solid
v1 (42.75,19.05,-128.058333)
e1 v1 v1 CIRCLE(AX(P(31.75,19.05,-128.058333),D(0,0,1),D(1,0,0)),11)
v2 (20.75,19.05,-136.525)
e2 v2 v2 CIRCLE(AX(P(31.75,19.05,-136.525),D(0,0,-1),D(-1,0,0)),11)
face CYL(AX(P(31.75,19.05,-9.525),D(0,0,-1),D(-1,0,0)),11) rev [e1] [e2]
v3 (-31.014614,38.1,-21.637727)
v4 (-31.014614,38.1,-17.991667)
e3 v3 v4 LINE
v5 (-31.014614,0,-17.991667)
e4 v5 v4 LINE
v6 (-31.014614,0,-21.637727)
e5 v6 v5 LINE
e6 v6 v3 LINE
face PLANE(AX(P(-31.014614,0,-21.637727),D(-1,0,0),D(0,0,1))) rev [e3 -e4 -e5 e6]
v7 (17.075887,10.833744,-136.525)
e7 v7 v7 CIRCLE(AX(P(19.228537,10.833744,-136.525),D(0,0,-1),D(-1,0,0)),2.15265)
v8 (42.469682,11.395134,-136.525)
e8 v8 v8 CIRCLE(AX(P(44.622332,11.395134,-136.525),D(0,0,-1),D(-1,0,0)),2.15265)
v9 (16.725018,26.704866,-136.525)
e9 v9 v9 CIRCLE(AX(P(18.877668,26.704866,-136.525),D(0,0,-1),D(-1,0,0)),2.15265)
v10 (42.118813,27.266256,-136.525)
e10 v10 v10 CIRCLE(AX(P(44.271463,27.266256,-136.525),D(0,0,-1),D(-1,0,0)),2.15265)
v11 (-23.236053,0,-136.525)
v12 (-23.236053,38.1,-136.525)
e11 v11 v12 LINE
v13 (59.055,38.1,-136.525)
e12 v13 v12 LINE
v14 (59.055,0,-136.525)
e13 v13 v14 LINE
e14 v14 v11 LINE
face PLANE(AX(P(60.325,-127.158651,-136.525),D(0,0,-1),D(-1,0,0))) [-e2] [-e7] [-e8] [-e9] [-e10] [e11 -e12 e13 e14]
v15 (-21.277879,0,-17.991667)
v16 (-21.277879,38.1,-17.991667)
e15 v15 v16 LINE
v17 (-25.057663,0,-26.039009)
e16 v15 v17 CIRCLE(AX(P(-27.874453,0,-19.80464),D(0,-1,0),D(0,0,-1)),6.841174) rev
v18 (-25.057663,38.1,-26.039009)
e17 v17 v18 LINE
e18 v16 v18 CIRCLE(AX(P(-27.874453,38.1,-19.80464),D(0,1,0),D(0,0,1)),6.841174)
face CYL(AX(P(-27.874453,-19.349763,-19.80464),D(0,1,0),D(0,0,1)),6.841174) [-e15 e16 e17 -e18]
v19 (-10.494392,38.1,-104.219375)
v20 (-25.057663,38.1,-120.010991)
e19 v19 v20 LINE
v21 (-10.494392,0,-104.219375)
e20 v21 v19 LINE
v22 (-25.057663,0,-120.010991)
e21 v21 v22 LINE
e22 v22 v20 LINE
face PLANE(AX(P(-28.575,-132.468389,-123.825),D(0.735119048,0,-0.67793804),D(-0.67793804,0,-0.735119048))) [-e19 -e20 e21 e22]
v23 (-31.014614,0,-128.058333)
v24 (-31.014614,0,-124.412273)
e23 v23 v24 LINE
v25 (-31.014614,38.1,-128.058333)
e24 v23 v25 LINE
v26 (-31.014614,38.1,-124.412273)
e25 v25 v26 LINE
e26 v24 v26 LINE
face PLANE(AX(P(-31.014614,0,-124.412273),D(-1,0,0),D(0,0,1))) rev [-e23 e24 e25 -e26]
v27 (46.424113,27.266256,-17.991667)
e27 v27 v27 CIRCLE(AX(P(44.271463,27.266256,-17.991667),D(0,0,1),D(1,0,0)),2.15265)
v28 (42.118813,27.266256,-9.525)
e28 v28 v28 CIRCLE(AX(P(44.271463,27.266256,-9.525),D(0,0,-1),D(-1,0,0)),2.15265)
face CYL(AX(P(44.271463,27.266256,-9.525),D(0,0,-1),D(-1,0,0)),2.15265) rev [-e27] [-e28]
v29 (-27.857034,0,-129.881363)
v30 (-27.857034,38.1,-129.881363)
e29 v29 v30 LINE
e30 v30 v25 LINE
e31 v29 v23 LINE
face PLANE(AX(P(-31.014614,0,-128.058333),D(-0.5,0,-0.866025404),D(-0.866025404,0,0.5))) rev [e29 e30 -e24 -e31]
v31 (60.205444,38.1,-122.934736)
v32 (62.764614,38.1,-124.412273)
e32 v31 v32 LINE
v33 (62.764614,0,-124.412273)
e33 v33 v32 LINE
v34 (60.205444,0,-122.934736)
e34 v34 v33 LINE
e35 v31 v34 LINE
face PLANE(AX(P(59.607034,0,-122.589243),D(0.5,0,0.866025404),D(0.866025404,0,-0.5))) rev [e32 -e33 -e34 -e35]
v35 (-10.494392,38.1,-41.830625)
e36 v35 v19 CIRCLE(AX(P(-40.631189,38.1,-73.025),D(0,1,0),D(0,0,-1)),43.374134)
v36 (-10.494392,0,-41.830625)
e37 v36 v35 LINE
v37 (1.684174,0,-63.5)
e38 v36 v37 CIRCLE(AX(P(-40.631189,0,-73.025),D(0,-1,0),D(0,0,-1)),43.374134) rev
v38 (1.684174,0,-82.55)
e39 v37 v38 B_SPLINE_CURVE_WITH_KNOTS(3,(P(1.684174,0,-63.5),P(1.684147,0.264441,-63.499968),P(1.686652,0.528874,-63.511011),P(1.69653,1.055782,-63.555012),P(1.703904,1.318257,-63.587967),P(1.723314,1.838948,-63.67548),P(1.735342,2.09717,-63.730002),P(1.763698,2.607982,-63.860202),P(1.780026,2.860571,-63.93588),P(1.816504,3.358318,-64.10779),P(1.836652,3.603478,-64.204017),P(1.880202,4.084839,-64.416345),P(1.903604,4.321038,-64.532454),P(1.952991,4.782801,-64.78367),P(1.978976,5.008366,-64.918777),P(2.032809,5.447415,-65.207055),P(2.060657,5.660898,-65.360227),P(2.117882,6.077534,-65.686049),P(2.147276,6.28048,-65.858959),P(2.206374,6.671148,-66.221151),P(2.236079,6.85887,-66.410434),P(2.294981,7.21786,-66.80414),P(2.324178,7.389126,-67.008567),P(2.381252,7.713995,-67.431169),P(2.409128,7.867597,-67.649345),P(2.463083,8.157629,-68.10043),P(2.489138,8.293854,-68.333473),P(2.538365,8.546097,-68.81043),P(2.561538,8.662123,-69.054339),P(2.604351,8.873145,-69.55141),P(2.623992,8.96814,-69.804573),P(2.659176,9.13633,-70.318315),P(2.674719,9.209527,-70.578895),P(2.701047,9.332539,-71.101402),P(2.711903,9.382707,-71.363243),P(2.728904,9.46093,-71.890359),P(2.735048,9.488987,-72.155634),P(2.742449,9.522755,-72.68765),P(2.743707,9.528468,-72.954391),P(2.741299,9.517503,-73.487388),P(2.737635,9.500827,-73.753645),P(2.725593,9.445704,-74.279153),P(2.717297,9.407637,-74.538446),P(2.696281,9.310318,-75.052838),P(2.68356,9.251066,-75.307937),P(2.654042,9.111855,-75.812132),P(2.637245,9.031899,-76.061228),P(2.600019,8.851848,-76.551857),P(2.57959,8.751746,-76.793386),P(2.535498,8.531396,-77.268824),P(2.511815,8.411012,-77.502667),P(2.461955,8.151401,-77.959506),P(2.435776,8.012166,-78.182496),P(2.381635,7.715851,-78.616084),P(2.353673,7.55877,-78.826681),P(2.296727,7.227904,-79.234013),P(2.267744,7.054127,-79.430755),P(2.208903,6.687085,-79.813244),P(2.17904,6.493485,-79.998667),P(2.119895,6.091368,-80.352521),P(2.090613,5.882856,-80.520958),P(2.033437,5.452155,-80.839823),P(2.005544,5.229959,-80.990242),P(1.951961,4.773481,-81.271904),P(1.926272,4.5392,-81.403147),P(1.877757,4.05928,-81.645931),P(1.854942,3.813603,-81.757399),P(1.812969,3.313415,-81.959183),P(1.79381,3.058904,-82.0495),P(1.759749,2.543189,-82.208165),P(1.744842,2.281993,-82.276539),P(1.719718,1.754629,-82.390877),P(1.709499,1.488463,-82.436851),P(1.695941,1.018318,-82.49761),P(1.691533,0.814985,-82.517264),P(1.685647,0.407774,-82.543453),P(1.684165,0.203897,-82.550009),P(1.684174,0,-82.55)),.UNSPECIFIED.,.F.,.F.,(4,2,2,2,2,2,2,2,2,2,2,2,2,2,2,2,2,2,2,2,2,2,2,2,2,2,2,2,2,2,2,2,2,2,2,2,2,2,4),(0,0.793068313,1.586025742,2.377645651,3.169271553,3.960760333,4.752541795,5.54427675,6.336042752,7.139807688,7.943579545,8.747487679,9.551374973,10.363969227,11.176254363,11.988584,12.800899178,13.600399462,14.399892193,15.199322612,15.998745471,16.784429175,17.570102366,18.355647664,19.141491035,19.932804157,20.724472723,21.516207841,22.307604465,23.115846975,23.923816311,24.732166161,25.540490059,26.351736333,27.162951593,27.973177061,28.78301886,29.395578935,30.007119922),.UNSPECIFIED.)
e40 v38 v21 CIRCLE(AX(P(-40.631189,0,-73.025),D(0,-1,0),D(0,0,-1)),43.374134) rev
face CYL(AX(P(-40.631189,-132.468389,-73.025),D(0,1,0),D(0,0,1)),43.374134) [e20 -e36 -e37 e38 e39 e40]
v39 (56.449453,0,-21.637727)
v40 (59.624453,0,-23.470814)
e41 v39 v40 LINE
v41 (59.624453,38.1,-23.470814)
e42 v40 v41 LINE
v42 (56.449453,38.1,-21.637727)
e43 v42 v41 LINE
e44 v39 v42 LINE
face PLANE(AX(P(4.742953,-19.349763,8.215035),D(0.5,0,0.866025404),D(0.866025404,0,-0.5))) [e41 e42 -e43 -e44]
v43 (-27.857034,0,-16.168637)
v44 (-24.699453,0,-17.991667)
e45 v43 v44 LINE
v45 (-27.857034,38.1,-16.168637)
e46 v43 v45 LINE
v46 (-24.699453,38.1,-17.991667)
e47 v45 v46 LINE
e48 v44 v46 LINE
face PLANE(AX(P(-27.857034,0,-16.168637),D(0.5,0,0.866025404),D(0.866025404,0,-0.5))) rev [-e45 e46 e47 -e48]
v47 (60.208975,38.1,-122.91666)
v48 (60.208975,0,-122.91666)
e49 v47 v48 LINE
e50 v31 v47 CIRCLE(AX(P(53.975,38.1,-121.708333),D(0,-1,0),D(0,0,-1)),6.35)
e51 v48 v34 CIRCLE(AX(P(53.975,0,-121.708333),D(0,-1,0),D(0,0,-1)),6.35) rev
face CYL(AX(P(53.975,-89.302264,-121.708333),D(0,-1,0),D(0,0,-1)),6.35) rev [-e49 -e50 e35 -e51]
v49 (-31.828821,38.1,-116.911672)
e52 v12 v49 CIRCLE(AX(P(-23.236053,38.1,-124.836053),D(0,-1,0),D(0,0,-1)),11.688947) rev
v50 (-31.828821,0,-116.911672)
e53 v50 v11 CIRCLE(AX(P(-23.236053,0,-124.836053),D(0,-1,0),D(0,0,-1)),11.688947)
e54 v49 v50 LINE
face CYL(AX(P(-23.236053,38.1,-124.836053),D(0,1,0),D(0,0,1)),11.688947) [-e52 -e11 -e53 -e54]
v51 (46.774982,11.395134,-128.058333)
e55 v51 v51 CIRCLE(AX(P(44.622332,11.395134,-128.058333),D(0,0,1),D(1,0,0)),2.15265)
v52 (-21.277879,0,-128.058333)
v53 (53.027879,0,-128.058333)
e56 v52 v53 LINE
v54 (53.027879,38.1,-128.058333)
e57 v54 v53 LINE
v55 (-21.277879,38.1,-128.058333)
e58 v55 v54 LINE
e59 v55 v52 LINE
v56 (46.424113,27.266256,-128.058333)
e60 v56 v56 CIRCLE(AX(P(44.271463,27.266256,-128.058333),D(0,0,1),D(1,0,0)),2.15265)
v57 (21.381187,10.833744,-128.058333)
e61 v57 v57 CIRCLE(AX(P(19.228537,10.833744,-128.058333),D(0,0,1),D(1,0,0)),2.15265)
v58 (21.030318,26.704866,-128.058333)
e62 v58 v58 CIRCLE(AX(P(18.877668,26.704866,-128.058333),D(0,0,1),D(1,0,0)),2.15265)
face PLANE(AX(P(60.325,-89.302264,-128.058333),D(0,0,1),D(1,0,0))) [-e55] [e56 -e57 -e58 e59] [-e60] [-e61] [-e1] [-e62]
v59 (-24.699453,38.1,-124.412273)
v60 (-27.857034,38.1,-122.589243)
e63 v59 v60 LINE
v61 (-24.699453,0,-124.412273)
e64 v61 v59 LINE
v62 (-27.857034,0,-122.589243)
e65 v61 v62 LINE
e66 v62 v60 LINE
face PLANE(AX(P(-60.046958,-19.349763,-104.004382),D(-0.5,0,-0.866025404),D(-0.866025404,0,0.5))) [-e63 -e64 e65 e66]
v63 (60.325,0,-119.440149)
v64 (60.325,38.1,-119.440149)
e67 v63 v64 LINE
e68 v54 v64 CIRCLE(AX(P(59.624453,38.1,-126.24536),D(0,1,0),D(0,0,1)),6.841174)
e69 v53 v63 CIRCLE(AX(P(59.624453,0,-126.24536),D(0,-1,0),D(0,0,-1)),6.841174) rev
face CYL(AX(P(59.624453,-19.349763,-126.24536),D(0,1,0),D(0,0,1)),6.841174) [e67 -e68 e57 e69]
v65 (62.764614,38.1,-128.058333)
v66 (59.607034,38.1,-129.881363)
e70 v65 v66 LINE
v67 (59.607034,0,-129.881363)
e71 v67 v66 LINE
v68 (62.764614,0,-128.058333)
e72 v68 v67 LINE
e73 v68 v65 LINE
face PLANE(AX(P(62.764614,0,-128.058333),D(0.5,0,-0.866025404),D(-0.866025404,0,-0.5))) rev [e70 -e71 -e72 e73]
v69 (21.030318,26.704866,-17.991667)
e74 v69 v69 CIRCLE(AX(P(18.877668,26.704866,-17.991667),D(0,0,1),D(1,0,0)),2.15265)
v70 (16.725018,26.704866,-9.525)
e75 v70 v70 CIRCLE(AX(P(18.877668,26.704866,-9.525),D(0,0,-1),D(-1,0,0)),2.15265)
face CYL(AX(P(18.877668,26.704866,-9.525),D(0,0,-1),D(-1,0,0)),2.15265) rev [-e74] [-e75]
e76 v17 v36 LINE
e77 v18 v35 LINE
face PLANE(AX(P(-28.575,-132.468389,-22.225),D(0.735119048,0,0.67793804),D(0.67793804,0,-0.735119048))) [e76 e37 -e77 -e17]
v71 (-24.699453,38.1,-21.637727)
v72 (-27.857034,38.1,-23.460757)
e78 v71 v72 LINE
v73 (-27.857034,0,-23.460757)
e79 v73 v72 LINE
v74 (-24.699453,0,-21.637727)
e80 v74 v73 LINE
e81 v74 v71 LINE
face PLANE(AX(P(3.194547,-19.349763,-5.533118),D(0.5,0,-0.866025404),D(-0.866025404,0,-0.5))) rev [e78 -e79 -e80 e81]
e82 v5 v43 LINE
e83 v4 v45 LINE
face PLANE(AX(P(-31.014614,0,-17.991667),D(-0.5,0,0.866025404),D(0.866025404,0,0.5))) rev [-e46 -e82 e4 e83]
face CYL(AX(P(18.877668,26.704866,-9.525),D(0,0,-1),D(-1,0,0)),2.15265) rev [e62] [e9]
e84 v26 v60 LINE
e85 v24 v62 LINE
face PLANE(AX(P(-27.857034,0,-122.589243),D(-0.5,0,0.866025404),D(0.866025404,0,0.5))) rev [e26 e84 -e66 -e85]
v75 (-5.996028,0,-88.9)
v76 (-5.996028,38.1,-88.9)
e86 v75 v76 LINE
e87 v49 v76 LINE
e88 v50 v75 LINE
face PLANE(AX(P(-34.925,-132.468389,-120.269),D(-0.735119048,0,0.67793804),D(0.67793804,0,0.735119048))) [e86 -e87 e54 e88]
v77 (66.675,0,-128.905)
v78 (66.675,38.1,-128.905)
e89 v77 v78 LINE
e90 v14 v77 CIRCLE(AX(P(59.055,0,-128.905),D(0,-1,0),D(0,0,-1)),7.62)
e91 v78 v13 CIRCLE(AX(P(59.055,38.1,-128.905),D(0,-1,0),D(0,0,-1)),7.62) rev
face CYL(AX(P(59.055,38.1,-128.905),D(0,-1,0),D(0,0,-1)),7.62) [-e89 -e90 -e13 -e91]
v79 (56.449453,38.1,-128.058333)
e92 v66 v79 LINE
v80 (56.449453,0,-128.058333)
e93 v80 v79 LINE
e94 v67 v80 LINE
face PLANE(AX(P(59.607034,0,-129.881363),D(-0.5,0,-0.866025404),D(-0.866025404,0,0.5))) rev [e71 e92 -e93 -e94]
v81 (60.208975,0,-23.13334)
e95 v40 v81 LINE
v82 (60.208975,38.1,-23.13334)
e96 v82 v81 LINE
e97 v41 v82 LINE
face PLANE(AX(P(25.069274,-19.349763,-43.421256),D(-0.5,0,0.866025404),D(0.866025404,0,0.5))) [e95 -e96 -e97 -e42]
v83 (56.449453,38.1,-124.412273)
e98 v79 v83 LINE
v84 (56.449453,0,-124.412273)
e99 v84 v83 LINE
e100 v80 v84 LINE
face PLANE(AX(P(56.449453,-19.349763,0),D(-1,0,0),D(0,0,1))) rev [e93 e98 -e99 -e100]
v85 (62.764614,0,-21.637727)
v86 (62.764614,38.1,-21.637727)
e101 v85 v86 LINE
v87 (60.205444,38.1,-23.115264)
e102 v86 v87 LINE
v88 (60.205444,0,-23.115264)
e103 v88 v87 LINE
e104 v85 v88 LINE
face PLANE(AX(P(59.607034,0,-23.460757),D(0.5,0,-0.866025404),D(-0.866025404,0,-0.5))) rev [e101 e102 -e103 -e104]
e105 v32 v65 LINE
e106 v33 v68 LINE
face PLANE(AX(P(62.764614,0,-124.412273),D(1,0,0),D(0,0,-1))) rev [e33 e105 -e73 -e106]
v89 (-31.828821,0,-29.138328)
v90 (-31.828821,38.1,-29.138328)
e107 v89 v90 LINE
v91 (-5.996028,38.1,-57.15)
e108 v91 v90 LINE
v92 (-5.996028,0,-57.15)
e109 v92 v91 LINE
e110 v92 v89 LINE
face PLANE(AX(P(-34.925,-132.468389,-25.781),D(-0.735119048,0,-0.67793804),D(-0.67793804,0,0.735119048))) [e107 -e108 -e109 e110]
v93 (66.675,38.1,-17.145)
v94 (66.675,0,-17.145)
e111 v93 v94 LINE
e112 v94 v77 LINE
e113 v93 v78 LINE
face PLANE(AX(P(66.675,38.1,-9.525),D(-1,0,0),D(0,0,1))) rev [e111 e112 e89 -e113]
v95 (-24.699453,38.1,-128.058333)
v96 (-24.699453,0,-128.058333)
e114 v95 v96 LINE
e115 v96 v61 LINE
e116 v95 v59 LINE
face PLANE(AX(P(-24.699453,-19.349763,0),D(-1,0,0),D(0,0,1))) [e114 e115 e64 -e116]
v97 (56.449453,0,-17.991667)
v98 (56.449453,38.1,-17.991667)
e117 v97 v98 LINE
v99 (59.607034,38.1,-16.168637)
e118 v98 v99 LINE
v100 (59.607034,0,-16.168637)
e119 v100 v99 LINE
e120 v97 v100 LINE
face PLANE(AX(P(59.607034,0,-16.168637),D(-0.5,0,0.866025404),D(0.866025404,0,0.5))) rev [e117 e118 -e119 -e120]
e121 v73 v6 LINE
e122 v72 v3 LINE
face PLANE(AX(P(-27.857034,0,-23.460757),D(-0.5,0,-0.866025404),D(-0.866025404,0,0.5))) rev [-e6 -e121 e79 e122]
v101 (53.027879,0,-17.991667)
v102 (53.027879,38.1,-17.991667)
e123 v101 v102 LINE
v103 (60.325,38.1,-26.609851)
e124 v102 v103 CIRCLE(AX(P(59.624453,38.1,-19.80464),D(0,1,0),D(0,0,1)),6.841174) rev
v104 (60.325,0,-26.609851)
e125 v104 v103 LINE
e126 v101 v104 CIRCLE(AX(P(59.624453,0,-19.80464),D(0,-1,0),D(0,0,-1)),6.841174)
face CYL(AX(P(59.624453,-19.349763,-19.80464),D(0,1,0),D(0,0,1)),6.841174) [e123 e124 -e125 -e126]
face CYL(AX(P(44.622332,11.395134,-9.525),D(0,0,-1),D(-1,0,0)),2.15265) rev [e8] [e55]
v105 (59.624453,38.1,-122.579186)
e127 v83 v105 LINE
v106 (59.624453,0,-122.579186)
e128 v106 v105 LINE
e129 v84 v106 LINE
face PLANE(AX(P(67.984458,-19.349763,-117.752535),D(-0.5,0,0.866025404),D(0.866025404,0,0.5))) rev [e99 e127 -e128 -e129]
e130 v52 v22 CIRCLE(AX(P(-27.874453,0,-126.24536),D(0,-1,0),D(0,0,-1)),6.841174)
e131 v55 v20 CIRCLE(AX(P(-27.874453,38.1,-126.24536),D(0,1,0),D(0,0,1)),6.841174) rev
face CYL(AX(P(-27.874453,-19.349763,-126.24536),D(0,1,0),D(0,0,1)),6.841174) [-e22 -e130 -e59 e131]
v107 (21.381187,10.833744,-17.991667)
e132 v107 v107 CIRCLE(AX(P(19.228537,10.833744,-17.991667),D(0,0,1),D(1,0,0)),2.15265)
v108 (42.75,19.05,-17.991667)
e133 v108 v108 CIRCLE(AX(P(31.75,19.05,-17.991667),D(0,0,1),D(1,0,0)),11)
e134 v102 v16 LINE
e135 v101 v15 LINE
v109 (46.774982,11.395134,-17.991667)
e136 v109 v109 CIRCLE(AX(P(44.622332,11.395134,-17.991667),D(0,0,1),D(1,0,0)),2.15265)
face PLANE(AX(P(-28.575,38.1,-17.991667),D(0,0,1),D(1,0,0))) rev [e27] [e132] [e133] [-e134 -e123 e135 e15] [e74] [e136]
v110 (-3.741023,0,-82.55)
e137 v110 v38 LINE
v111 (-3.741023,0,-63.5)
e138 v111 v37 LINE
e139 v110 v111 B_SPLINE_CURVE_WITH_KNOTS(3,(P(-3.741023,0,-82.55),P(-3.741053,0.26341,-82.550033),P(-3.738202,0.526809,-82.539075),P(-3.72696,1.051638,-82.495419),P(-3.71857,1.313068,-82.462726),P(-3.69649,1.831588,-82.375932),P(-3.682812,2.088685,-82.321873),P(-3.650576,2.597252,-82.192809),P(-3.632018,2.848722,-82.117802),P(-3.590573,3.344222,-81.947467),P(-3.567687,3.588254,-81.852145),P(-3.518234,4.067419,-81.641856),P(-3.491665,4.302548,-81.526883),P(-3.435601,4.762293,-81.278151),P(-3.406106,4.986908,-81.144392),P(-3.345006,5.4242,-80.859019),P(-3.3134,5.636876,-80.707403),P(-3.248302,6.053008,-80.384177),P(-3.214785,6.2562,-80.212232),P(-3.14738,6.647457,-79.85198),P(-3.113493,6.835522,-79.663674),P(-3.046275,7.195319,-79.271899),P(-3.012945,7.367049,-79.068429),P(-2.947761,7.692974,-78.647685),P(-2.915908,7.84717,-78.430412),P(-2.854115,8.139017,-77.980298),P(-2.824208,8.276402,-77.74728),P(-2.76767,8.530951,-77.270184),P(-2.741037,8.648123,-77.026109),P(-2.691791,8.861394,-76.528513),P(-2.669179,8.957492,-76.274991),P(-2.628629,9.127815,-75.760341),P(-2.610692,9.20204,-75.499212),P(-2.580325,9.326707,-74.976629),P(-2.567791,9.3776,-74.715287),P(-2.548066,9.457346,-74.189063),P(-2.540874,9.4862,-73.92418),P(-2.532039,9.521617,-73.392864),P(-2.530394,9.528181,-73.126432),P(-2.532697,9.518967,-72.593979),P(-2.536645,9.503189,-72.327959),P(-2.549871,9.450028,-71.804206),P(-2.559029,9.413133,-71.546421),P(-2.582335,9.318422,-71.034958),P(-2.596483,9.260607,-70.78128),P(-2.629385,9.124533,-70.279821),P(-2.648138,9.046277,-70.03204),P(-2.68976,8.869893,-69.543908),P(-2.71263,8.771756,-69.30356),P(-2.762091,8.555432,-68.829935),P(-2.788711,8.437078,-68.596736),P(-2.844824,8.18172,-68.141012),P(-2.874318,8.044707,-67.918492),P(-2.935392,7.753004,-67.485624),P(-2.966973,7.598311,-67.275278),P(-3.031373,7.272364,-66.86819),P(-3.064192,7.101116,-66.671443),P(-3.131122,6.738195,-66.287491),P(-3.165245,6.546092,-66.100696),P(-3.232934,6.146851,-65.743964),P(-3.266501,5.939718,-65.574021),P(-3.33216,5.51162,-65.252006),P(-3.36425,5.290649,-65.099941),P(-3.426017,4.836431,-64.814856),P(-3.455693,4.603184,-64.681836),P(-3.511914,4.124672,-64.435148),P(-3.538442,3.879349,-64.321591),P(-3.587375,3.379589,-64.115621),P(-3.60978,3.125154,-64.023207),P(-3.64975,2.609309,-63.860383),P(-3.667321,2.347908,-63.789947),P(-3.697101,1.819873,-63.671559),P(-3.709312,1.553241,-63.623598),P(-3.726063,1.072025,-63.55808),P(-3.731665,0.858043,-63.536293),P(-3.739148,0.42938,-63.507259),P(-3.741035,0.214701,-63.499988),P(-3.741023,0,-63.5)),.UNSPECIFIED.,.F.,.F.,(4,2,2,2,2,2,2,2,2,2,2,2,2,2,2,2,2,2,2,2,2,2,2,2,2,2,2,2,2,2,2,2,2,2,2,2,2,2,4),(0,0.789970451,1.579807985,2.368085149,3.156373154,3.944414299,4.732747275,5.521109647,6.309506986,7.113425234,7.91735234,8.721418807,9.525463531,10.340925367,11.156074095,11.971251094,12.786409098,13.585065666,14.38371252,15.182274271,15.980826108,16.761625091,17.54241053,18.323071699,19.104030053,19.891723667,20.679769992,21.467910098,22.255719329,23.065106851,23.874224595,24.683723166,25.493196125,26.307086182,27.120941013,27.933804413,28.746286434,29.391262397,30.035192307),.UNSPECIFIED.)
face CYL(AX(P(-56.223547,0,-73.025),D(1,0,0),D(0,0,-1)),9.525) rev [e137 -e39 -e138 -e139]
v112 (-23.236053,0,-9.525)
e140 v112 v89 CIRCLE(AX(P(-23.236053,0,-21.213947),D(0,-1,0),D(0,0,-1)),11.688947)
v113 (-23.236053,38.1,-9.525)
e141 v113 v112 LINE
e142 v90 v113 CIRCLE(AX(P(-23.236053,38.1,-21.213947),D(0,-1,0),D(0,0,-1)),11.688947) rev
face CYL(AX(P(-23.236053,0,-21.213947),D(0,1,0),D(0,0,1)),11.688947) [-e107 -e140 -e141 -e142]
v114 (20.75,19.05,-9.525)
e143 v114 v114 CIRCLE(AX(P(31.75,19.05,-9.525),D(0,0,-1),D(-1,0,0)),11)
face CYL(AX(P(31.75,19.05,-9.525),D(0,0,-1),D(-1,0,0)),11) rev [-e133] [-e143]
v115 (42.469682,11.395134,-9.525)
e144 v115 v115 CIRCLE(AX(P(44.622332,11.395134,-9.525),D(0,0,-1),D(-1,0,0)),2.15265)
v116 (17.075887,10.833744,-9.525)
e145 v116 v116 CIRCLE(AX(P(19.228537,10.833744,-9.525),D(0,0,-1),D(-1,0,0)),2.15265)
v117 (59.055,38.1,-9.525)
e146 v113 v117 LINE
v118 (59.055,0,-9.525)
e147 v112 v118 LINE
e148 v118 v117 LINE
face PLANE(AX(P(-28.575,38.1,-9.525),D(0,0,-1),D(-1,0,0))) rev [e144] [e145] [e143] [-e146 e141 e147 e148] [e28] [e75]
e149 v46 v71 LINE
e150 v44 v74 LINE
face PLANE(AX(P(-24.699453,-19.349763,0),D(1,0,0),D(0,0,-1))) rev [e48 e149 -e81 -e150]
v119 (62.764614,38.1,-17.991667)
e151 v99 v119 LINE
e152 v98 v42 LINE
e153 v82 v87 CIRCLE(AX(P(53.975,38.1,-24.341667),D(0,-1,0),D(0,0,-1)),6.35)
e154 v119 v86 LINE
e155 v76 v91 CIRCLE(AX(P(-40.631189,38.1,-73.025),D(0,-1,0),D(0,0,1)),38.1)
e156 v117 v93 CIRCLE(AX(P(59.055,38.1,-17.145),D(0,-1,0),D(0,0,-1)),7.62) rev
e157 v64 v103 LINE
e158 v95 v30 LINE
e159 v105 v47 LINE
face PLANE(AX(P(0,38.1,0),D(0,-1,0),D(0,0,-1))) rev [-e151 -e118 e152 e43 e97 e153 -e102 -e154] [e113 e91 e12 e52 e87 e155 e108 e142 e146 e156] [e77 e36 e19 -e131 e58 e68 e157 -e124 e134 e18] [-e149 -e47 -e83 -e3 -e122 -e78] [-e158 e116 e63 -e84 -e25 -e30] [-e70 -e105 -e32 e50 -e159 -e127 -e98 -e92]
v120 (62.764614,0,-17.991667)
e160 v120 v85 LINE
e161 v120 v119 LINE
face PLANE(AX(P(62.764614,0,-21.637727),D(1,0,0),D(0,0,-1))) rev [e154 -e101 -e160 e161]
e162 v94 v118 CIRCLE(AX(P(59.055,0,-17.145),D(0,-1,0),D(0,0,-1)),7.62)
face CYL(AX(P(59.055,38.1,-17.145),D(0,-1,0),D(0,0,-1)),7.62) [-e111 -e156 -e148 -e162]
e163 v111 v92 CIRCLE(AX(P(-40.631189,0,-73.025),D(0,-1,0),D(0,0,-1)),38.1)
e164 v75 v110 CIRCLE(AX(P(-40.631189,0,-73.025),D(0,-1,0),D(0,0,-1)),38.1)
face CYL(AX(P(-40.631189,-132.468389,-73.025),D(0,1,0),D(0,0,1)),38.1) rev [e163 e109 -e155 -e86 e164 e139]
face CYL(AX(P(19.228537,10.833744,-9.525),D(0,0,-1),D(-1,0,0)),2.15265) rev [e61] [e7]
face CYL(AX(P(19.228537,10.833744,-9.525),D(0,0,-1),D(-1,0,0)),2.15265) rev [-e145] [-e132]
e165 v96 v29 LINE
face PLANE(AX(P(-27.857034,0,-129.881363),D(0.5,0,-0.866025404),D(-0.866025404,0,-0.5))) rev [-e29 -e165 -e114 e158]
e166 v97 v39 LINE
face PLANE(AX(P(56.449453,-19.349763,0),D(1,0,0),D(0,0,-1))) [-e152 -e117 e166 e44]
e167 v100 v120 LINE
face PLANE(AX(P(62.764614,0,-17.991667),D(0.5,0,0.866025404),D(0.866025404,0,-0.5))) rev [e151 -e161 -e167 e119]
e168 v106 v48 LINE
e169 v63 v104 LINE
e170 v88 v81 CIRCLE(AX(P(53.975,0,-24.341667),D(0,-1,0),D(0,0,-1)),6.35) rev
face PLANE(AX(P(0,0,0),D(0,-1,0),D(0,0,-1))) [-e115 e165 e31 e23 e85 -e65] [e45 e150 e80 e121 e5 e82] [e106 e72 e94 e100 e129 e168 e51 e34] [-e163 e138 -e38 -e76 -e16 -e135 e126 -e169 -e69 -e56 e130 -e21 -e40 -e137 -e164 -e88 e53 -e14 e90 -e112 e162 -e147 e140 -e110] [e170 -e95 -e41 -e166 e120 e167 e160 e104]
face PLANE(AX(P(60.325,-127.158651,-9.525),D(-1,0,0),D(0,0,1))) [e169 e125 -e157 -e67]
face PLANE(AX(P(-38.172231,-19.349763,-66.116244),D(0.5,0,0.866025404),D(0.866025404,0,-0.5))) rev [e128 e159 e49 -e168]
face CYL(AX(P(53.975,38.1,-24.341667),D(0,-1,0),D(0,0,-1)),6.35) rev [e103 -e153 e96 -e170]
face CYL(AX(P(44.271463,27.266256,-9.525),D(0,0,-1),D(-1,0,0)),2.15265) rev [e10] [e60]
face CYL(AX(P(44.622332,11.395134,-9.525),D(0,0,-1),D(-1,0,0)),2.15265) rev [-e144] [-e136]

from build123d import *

# Parameters (mm, degrees)
SKETCH1_W               = 95.25
SKETCH1_H               = 8.466666667
BOSS_EXTRUDE1_DEPTH     = 38.1
SKETCH2_W               = 6.35
SKETCH2_H               = 127
BOSS_EXTRUDE2_DEPTH     = 38.1
SKETCH3_W               = 88.9
SKETCH3_H               = 8.466666667
BOSS_EXTRUDE3_DEPTH     = 38.1
SKETCH4_R               = 11
CUT_EXTRUDE1_DEPTH      = 149.412147835
SKETCH5_R               = 2.15265
CUT_EXTRUDE2_DEPTH      = 149.412147835
FILLET1_R               = 7.62
BOSS_EXTRUDE4_DEPTH     = 38.1
CUT_EXTRUDE8_REACH      = 172.773
CUT_EXTRUDE8_END_RADIUS = 38.1
FILLET2_R               = 11.688947
FILLET3_R               = 11.688947
FILLET4_R               = 6.35
BOSS_EXTRUDE7_START     = -38.1
BOSS_EXTRUDE7_DEPTH     = 38.1
CUT_EXTRUDE12_DEPTH     = 157.640484095


with BuildPart() as part:
    # Sketch1 → Boss-Extrude1 (new body)
    with BuildSketch(Plane(origin=(0, 0, 0), x_dir=(1, 0, 0), z_dir=(0, 1, 0))):
        with Locations((19.05, 13.758333334)):
            Rectangle(SKETCH1_W, SKETCH1_H)
    extrude(amount=BOSS_EXTRUDE1_DEPTH)

    # Sketch2 → Boss-Extrude2 (add)
    with BuildSketch(Plane(origin=(0, 38.1, 0), x_dir=(1, 0, 0), z_dir=(0, 1, 0))):
        with Locations((63.5, 73.025)):
            Rectangle(SKETCH2_W, SKETCH2_H)
    extrude(amount=-BOSS_EXTRUDE2_DEPTH)

    # Sketch3 → Boss-Extrude3 (add)
    with BuildSketch(Plane(origin=(0, 38.1, 0), x_dir=(1, 0, 0), z_dir=(0, 1, 0))):
        with Locations((15.875, 132.291666667)):
            Rectangle(SKETCH3_W, SKETCH3_H)
    extrude(amount=-BOSS_EXTRUDE3_DEPTH)

    # Sketch4 → Cut-Extrude1 (cut, through all)
    with BuildSketch(Plane(origin=(0, 0, -136.525), x_dir=(-1, 0, 0), z_dir=(0, 0, -1))):
        with Locations((-31.75, 19.05)):
            Circle(SKETCH4_R)
    extrude(amount=-CUT_EXTRUDE1_DEPTH, mode=Mode.SUBTRACT)

    # Sketch5 → Cut-Extrude2 (cut, through all)
    with BuildSketch(Plane(origin=(0, 0, -136.525), x_dir=(-1, 0, 0), z_dir=(0, 0, -1))):
        with Locations((-18.877667779, 26.704865736)):
            Circle(SKETCH5_R)
        with Locations((-19.228536904, 10.833743663)):
            Circle(SKETCH5_R)
        with Locations((-44.622332221, 11.395134264)):
            Circle(SKETCH5_R)
        with Locations((-44.271463096, 27.266256337)):
            Circle(SKETCH5_R)
    extrude(amount=-CUT_EXTRUDE2_DEPTH, mode=Mode.SUBTRACT)

    # Fillet1
    fillet1_edges = [part.edges().sort_by_distance(p)[0] for p in [
        (66.675, 19.05, -136.525),
        (66.675, 19.05, -9.525),
    ]]
    fillet(fillet1_edges, radius=FILLET1_R)

    # Sketch10 → Boss-Extrude4 (add)
    with BuildSketch(Plane(origin=(0, 38.1, 0), x_dir=(1, 0, 0), z_dir=(0, 1, 0))):
        with BuildLine():
            Line((-28.575, 17.991666667), (-28.575, 9.525))
            Line((-28.575, 9.525), (-34.925, 9.525))
            Line((-34.925, 9.525), (-34.925, 25.781))
            Line((-34.925, 25.781), (-5.996027965, 57.15))
            ThreePointArc((-5.996027965, 57.15), (-2.531188929, 73.025), (-5.996027965, 88.9))
            Line((-5.996027965, 88.9), (-34.925, 120.269))
            Line((-34.925, 120.269), (-34.925, 136.525))
            Line((-34.925, 136.525), (-28.575, 136.525))
            Line((-28.575, 136.525), (-28.575, 123.825))
            Line((-28.575, 123.825), (-10.494392478, 104.219375))
            ThreePointArc((-10.494392478, 104.219375), (2.742945437, 73.025), (-10.494392478, 41.830625))
            Line((-10.494392478, 41.830625), (-28.575, 22.225))
            Line((-28.575, 22.225), (-28.575, 17.991666667))
        make_face()
    extrude(amount=-BOSS_EXTRUDE4_DEPTH)

    # Cut-Extrude8: up to this cylinder (the profile starts outside it)
    cut_extrude8_end = Plane(origin=(-40.631188929, 4.042536, -73.025), z_dir=(0, 1, 0)) * Cylinder(CUT_EXTRUDE8_END_RADIUS, 422.746, mode=Mode.PRIVATE)
    # Sketch12 → Cut-Extrude8 (cut, up to the surface)
    with BuildSketch(Plane.ZY.offset(-60.325), mode=Mode.PRIVATE) as cut_extrude8_sk1:
        with BuildLine():
            Line((-82.55, 0), (-63.5, 0))
            ThreePointArc((-63.5, 0), (-73.025, 9.525), (-82.55, 0))
        make_face()
    cut_extrude8_tool1 = extrude(cut_extrude8_sk1.sketch, amount=CUT_EXTRUDE8_REACH, mode=Mode.PRIVATE) - cut_extrude8_end
    add(cut_extrude8_tool1.solids().sort_by_distance((60.325, 4.042536, -73.025))[0], mode=Mode.SUBTRACT)

    # Fillet2
    fillet2_edges = [part.edges().sort_by_distance(p)[0] for p in [
        (-34.925, 19.05, -136.525),
        (-34.925, 19.05, -120.269),
    ]]
    fillet(fillet2_edges, radius=FILLET2_R - 0.0001)  # a hair under: the kernel refuses the full size

    # Fillet3
    fillet3_edges = [part.edges().sort_by_distance(p)[0] for p in [
        (-34.925, 19.05, -25.781),
        (-34.925, 19.05, -9.525),
    ]]
    fillet(fillet3_edges, radius=FILLET3_R - 0.0001)  # a hair under: the kernel refuses the full size

    # Fillet4
    fillet4_edges = [part.edges().sort_by_distance(p)[0] for p in [
        (60.325, 19.05, -17.991666667),
        (60.325, 19.05, -128.058333333),
    ]]
    fillet(fillet4_edges, radius=FILLET4_R)

    # Sketch15 → Boss-Extrude7 (add)
    with BuildSketch(Plane(origin=(0, 38.1, 0), x_dir=(1, 0, 0), z_dir=(0, 1, 0)).offset(BOSS_EXTRUDE7_START)):
        with BuildLine():
            Line((-27.874453006, 23.470813729), (-27.581873113, 23.301892649))
            Line((-27.581873113, 23.301892649), (-25.057662874, 26.039008606))
            ThreePointArc((-25.057662874, 26.039008606), (-34.066608211, 16.896224406), (-21.277878592, 17.991666667))
            Line((-21.277878592, 17.991666667), (-24.699453006, 17.991666667))
            Line((-24.699453006, 17.991666667), (-24.699453006, 17.971552415))
            Line((-24.699453006, 17.971552415), (-27.874453006, 16.13846531))
            Line((-27.874453006, 16.13846531), (-31.049453006, 17.971552415))
            Line((-31.049453006, 17.971552415), (-31.049453006, 21.637726624))
            Line((-31.049453006, 21.637726624), (-27.874453006, 23.470813729))
        make_face()
        with BuildLine():
            Line((-27.581873113, 23.301892649), (-24.699453006, 21.637726624))
            Line((-24.699453006, 21.637726624), (-24.699453006, 17.991666667))
            Line((-24.699453006, 17.991666667), (-21.277878592, 17.991666667))
            ThreePointArc((-21.277878592, 17.991666667), (-21.094704511, 18.889940166), (-21.033278796, 19.804639519))
            ThreePointArc((-21.033278796, 19.804639519), (-22.126765794, 23.514862731), (-25.057662874, 26.039008606))
            Line((-25.057662874, 26.039008606), (-27.581873113, 23.301892649))
        make_face()
        with BuildLine():
            ThreePointArc((60.325, 26.609850645), (54.403432166, 24.225341495), (53.027878592, 17.991666667))
            Line((53.027878592, 17.991666667), (53.975, 17.991666667))
            ThreePointArc((53.975, 17.991666667), (55.237426297, 18.118421545), (56.449453006, 18.493625771))
            Line((56.449453006, 18.493625771), (56.449453006, 21.637726624))
            Line((56.449453006, 21.637726624), (59.624453006, 23.470813729))
            Line((59.624453006, 23.470813729), (60.208975135, 23.13333972))
            ThreePointArc((60.208975135, 23.13333972), (60.295927231, 23.734724375), (60.325, 24.341666667))
            Line((60.325, 24.341666667), (60.325, 26.609850645))
        make_face()
        with BuildLine():
            Line((53.975, 17.991666667), (53.027878592, 17.991666667))
            ThreePointArc((53.027878592, 17.991666667), (60.539152358, 13.024891024), (66.465627215, 19.804639519))
            ThreePointArc((66.465627215, 19.804639519), (64.703538976, 24.387711662), (60.325, 26.609850645))
            Line((60.325, 26.609850645), (60.325, 24.341666667))
            ThreePointArc((60.325, 24.341666667), (60.295927231, 23.734724375), (60.208975135, 23.13333972))
            Line((60.208975135, 23.13333972), (62.799453006, 21.637726624))
            Line((62.799453006, 21.637726624), (62.799453006, 17.971552415))
            Line((62.799453006, 17.971552415), (59.624453006, 16.13846531))
            Line((59.624453006, 16.13846531), (56.449453006, 17.971552415))
            Line((56.449453006, 17.971552415), (56.449453006, 18.493625771))
            ThreePointArc((56.449453006, 18.493625771), (55.237426297, 18.118421545), (53.975, 17.991666667))
        make_face()
        with BuildLine():
            Line((60.325, 121.708333333), (60.325, 119.440149355))
            ThreePointArc((60.325, 119.440149355), (64.703538976, 121.662288338), (66.465627215, 126.245360481))
            ThreePointArc((66.465627215, 126.245360481), (60.539152358, 133.025108976), (53.027878592, 128.058333333))
            Line((53.027878592, 128.058333333), (53.975, 128.058333333))
            ThreePointArc((53.975, 128.058333333), (55.237426297, 127.931578455), (56.449453006, 127.556374229))
            Line((56.449453006, 127.556374229), (56.449453006, 128.078447585))
            Line((56.449453006, 128.078447585), (59.624453006, 129.91153469))
            Line((59.624453006, 129.91153469), (62.799453006, 128.078447585))
            Line((62.799453006, 128.078447585), (62.799453006, 124.412273376))
            Line((62.799453006, 124.412273376), (60.208975135, 122.91666028))
            ThreePointArc((60.208975135, 122.91666028), (60.295927231, 122.315275625), (60.325, 121.708333333))
        make_face()
        with BuildLine():
            ThreePointArc((53.027878592, 128.058333333), (54.403432166, 121.824658505), (60.325, 119.440149355))
            Line((60.325, 119.440149355), (60.325, 121.708333333))
            ThreePointArc((60.325, 121.708333333), (60.295927231, 122.315275625), (60.208975135, 122.91666028))
            Line((60.208975135, 122.91666028), (59.624453006, 122.579186271))
            Line((59.624453006, 122.579186271), (56.449453006, 124.412273376))
            Line((56.449453006, 124.412273376), (56.449453006, 127.556374229))
            ThreePointArc((56.449453006, 127.556374229), (55.237426297, 127.931578455), (53.975, 128.058333333))
            Line((53.975, 128.058333333), (53.027878592, 128.058333333))
        make_face()
        with BuildLine():
            Line((-24.699453006, 128.058333333), (-21.277878592, 128.058333333))
            ThreePointArc((-21.277878592, 128.058333333), (-34.066608211, 129.153775594), (-25.057662874, 120.010991394))
            Line((-25.057662874, 120.010991394), (-27.581873113, 122.748107351))
            Line((-27.581873113, 122.748107351), (-27.874453006, 122.579186271))
            Line((-27.874453006, 122.579186271), (-31.049453006, 124.412273376))
            Line((-31.049453006, 124.412273376), (-31.049453006, 128.078447585))
            Line((-31.049453006, 128.078447585), (-27.874453006, 129.91153469))
            Line((-27.874453006, 129.91153469), (-24.699453006, 128.078447585))
            Line((-24.699453006, 128.078447585), (-24.699453006, 128.058333333))
        make_face()
        with BuildLine():
            ThreePointArc((-21.033278796, 126.245360481), (-21.094704511, 127.160059834), (-21.277878592, 128.058333333))
            Line((-21.277878592, 128.058333333), (-24.699453006, 128.058333333))
            Line((-24.699453006, 128.058333333), (-24.699453006, 124.412273376))
            Line((-24.699453006, 124.412273376), (-27.581873113, 122.748107351))
            Line((-27.581873113, 122.748107351), (-25.057662874, 120.010991394))
            ThreePointArc((-25.057662874, 120.010991394), (-22.126765794, 122.535137269), (-21.033278796, 126.245360481))
        make_face()
    extrude(amount=BOSS_EXTRUDE7_DEPTH)

    # Sketch21 → Cut-Extrude12 (cut, through all)
    with BuildSketch(Plane(origin=(0, 38.1, 0), x_dir=(1, 0, 0), z_dir=(0, 1, 0))):
        Polygon((-24.699453006, 21.637726624), (-27.857033552, 23.460756602), (-31.014614099, 21.637726624), (-31.014614099, 17.991666667), (-27.857033552, 16.168636688), (-24.699453006, 17.991666667), align=None)
        Polygon((56.449453006, 17.991666667), (56.449453006, 21.637726624), (59.607033552, 23.460756602), (62.764614099, 21.637726624), (62.764614099, 17.991666667), (59.607033552, 16.168636688), align=None)
        Polygon((59.607033552, 129.881363312), (56.449453006, 128.058333333), (56.449453006, 124.412273376), (59.607033552, 122.589243398), (62.764614099, 124.412273376), (62.764614099, 128.058333333), align=None)
        Polygon((-24.699453006, 128.058333333), (-24.699453006, 124.412273376), (-27.857033552, 122.589243398), (-31.014614099, 124.412273376), (-31.014614099, 128.058333333), (-27.857033552, 129.881363312), align=None)
    extrude(amount=-CUT_EXTRUDE12_DEPTH, mode=Mode.SUBTRACT)


solid = part.part
